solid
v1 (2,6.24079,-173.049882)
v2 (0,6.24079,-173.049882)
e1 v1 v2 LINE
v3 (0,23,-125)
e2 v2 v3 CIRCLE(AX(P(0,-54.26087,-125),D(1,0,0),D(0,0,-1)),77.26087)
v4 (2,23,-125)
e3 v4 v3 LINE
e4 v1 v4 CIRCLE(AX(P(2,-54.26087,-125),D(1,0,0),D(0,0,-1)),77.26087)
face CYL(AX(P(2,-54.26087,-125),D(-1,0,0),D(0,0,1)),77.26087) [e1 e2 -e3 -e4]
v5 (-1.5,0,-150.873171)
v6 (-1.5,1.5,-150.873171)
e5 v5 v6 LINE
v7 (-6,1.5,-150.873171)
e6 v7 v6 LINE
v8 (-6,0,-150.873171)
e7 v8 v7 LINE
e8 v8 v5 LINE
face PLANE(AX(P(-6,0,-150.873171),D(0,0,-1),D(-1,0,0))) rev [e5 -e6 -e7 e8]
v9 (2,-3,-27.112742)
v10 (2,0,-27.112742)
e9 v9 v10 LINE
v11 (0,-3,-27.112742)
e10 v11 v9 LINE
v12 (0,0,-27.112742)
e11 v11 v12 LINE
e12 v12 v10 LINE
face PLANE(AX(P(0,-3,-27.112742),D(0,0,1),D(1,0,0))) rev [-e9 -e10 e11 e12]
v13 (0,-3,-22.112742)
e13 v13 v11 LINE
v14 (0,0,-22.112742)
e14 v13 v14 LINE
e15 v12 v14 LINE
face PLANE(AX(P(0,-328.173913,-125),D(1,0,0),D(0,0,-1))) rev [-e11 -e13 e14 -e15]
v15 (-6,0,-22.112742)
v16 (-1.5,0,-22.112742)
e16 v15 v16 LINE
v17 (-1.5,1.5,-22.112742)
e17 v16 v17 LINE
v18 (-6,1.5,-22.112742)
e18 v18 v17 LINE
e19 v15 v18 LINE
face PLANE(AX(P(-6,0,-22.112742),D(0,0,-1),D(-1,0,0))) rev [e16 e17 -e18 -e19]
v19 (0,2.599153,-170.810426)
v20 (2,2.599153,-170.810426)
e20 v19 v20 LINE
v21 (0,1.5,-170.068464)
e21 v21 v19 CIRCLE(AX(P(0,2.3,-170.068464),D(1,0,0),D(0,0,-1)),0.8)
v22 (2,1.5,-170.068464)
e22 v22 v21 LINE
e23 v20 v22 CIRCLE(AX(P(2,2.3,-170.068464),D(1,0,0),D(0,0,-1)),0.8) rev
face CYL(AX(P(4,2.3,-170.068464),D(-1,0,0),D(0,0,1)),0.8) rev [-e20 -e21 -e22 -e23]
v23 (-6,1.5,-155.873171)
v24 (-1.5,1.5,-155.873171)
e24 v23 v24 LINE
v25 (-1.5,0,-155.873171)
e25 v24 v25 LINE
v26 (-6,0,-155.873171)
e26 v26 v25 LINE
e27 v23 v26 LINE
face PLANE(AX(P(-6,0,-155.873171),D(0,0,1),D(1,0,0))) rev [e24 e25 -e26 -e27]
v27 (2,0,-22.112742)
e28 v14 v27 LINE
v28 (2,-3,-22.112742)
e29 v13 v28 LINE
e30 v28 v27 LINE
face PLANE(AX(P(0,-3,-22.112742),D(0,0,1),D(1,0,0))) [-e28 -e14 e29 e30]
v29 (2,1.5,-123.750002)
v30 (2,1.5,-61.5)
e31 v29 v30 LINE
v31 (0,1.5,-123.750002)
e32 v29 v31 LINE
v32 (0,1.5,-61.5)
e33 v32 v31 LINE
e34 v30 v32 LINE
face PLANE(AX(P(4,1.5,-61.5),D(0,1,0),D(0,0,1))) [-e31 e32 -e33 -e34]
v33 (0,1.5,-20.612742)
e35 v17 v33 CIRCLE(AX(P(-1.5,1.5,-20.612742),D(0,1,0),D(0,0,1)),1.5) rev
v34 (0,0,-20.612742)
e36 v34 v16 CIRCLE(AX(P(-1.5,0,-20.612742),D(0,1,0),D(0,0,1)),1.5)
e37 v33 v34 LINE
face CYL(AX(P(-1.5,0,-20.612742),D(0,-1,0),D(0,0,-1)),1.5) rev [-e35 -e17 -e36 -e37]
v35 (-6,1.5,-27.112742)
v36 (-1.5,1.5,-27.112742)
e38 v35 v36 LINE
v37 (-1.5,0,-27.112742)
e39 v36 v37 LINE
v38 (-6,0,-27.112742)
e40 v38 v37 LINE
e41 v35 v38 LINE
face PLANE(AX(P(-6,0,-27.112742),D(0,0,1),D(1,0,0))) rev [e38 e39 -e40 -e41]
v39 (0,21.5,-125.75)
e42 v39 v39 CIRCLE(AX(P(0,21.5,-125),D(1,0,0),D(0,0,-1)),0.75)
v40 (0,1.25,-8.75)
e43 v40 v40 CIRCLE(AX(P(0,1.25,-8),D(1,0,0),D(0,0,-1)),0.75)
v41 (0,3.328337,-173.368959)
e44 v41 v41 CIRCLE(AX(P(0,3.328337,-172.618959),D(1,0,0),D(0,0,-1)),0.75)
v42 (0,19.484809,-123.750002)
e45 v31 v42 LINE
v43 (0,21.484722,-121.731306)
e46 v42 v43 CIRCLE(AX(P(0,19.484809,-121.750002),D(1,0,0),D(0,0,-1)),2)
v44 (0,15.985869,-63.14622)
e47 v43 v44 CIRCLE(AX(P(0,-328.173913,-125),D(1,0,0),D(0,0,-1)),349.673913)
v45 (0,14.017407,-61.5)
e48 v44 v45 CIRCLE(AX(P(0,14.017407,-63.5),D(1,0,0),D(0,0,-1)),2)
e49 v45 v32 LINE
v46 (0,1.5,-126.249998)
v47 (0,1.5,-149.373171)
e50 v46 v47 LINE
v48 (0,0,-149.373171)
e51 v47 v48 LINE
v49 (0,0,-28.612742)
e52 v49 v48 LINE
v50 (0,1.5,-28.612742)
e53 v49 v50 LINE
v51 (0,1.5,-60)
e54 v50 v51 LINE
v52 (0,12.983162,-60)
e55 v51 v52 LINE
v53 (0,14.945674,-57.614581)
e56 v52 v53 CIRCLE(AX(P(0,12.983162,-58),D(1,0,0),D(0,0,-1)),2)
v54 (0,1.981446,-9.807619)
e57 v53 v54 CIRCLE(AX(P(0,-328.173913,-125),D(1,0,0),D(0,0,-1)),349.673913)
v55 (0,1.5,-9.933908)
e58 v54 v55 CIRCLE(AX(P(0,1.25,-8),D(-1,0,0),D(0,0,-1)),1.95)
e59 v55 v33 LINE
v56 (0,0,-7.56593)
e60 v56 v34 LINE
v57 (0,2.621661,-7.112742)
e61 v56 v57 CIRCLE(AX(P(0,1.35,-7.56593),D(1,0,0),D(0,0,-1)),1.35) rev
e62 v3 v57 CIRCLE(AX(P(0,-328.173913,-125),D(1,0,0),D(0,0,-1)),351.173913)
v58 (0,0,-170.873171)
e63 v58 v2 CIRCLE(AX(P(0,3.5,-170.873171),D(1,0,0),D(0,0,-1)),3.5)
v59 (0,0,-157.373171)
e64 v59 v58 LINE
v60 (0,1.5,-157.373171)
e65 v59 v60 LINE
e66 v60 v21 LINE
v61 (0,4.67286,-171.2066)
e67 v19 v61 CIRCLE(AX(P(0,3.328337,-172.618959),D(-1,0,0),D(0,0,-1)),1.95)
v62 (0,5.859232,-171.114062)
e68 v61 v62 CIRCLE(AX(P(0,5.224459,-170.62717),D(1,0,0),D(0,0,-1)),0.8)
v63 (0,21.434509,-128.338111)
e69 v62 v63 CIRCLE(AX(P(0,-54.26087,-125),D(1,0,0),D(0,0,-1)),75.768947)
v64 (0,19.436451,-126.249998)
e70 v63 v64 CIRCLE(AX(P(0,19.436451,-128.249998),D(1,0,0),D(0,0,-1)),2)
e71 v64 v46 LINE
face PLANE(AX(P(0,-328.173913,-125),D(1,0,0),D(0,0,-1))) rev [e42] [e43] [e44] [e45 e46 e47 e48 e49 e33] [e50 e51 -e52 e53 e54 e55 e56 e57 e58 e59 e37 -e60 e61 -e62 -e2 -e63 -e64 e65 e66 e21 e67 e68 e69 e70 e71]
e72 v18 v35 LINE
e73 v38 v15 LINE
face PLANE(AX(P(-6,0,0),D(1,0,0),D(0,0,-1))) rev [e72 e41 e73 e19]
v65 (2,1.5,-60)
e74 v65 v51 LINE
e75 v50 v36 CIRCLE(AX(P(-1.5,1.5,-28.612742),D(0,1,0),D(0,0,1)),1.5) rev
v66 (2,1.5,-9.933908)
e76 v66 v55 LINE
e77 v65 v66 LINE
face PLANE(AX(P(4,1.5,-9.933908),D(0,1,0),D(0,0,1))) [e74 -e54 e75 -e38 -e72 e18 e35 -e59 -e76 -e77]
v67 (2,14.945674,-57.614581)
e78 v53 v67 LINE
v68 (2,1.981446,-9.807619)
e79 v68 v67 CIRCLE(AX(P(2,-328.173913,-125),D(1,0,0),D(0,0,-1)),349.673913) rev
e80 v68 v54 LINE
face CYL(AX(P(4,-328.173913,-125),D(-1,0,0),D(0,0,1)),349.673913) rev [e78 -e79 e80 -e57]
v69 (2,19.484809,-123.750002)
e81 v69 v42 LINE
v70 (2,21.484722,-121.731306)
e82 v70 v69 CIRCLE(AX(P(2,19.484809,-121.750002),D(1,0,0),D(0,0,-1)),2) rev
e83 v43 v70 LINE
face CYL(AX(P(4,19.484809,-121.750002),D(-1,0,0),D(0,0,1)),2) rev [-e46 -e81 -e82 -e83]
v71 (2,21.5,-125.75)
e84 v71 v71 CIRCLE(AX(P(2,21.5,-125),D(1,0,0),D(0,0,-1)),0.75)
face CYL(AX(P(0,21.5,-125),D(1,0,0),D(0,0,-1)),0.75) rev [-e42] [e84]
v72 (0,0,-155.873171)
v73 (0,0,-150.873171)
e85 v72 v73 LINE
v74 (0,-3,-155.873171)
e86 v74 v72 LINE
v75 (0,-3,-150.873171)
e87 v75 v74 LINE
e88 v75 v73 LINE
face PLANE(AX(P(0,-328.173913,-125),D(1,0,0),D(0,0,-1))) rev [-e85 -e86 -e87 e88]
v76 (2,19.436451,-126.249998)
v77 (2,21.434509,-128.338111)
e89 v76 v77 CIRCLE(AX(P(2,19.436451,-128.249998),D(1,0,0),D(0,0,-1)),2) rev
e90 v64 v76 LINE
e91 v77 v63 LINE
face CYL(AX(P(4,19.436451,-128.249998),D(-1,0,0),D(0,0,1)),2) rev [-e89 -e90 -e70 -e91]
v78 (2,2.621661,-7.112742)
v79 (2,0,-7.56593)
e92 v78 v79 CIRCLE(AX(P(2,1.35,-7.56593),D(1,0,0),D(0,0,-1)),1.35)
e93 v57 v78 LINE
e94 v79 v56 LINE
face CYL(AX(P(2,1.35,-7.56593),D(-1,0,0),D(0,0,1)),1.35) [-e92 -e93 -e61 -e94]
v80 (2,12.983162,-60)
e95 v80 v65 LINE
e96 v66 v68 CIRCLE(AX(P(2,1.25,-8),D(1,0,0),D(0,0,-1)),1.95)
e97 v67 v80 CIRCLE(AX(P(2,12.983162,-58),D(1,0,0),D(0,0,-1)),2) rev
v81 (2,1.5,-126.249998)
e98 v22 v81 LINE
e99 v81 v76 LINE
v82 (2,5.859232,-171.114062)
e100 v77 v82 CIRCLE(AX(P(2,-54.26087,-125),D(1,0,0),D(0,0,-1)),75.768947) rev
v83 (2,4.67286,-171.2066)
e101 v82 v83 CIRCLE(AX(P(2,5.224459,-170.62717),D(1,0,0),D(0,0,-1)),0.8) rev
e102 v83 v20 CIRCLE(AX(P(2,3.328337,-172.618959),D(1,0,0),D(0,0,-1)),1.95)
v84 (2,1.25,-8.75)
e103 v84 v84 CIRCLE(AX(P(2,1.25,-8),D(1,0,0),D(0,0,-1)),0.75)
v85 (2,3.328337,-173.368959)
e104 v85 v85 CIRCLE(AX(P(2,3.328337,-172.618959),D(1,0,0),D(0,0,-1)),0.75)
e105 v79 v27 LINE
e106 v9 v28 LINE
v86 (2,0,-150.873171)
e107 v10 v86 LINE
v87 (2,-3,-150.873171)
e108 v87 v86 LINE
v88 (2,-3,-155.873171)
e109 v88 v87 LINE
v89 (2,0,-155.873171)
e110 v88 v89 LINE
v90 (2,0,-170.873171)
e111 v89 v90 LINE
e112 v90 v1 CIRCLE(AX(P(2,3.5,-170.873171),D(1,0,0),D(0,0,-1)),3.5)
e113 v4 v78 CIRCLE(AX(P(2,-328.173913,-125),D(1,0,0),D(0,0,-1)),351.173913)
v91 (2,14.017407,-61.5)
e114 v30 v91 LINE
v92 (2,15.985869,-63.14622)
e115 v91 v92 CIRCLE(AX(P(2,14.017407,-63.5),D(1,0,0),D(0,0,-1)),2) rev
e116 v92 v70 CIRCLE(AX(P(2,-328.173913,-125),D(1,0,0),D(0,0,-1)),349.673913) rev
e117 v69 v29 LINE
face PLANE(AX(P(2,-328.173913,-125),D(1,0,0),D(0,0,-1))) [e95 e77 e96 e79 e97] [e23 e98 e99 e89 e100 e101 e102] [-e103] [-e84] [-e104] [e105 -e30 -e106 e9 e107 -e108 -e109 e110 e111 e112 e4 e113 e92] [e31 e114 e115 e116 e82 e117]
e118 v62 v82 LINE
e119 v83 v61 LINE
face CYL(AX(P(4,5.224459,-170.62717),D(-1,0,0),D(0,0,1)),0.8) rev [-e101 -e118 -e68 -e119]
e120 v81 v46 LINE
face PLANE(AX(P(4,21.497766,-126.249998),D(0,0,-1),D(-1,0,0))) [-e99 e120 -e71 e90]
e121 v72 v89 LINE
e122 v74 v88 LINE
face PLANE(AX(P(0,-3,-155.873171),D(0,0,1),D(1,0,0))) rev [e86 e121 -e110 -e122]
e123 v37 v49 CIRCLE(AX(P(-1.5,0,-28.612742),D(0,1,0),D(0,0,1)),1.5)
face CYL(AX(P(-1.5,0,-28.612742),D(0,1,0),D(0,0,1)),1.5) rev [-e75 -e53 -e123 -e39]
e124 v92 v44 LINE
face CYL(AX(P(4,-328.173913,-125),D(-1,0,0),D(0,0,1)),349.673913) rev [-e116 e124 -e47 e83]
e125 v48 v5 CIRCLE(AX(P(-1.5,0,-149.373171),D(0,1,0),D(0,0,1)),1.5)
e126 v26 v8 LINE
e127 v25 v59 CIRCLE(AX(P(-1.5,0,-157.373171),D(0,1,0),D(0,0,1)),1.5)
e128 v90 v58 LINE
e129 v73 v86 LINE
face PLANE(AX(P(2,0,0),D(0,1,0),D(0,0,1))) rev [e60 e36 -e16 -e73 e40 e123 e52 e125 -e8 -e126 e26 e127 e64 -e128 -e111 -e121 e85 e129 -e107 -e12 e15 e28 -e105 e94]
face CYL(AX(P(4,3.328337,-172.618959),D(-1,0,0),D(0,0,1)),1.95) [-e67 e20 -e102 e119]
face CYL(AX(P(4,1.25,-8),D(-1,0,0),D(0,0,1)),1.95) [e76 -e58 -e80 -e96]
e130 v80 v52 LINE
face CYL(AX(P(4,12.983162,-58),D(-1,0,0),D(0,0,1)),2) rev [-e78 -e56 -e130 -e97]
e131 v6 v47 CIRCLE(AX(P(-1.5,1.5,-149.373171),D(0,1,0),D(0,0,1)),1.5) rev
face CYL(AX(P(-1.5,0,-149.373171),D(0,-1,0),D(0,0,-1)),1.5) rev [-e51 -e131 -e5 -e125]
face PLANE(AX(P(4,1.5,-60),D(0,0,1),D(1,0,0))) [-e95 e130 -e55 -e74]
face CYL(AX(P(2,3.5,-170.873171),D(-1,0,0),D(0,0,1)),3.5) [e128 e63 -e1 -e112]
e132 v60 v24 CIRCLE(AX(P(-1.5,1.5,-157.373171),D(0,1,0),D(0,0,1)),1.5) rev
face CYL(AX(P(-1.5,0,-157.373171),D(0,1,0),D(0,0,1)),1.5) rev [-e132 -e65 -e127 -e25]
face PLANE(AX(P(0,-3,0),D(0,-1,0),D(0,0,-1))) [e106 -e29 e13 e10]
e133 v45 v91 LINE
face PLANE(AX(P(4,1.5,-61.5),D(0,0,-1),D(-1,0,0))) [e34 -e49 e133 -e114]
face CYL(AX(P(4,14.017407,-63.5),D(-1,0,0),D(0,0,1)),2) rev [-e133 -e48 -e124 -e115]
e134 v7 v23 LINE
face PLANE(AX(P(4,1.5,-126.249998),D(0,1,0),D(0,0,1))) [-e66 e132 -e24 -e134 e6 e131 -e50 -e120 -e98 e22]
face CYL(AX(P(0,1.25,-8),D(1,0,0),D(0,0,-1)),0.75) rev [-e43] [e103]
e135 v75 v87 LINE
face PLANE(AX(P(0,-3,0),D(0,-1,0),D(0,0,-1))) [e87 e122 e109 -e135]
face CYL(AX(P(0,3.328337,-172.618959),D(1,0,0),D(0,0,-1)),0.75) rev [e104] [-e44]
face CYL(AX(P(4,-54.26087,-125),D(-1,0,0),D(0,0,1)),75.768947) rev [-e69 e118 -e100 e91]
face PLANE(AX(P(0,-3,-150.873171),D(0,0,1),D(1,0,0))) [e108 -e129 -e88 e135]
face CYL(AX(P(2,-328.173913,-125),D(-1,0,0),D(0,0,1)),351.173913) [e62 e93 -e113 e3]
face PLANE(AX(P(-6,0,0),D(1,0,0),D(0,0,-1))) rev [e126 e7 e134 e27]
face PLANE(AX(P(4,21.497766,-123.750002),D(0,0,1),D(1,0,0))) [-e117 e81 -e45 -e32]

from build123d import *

# Parameters (mm, degrees)
BOSS_EXTRU_1_DEPTH      = 2
ESQUISSE4_R             = 0.75
ENL_V_MAT_EXTRU_2_DEPTH = 176.894862906
ENL_V_MAT_EXTRU_3_DEPTH = 4
CONG_2_R                = 1.35
ESQUISSE12_W            = 2
ESQUISSE12_H            = 5
BOSS_EXTRU_2_DEPTH      = 3
CONG_3_R                = 2
CONG_4_R                = 0.8
ESQUISSE13_W            = 5
ESQUISSE13_H            = 1.5
BOSS_EXTRU_3_DEPTH      = 6
CONG_5_R                = 1.5


with BuildPart() as part:
    # Esquisse2 → Boss.-Extru.1 (new body)
    with BuildSketch(Plane(origin=(0, 0, 0), x_dir=(0, 0, -1), z_dir=(1, 0, 0))):
        with BuildLine():
            Line((0, 0), (170.873171093, 0))
            ThreePointArc((170.873171093, 0), (174.177922559, 2.347343181), (173.049882129, 6.240789861))
            ThreePointArc((173.049882129, 6.240789861), (150.444362328, 18.689979585), (125, 23))
            ThreePointArc((125, 23), (61.450806457, 17.202138822), (0, 0))
        make_face()
    extrude(amount=BOSS_EXTRU_1_DEPTH)

    # Esquisse4 → Enlèv. mat.-Extru.2 (cut, through all)
    with BuildSketch(Plane(origin=(2, 0, 0), x_dir=(0, 0, -1), z_dir=(1, 0, 0))):
        with Locations((125, 21.5)):
            Circle(ESQUISSE4_R)
        with Locations((172.618958832, 3.328337296)):
            Circle(ESQUISSE4_R)
        with Locations((8, 1.25)):
            Circle(ESQUISSE4_R)
    extrude(amount=-ENL_V_MAT_EXTRU_2_DEPTH, mode=Mode.SUBTRACT)

    # Esquisse9 → Enlèv. mat.-Extru.3 (cut)
    with BuildSketch(Plane(origin=(0, 0, 0), x_dir=(0, 0, -1), z_dir=(1, 0, 0))):
        with BuildLine():
            Line((126.249998003, 1.5), (171.940959768, 1.5))
            ThreePointArc((171.940959768, 1.5), (170.669151645, 3.355758734), (171.992643995, 5.175018028))
            ThreePointArc((171.992643995, 5.175018028), (150.464605834, 17.100795028), (126.249998003, 21.497765776))
            Line((126.249998003, 21.497765776), (126.249998003, 1.5))
        make_face()
        with BuildLine():
            Line((9.933907961, 1.5), (60, 1.5))
            Line((60, 1.5), (60, 15.405547145))
            ThreePointArc((60, 15.405547145), (34.654135968, 9.627019927), (9.807619224, 1.981445651))
            ThreePointArc((9.807619224, 1.981445651), (9.886187662, 1.744768736), (9.933907961, 1.5))
        make_face()
        with BuildLine():
            Line((61.5, 1.5), (123.750001997, 1.5))
            Line((123.750001997, 1.5), (123.750001997, 21.497765776))
            ThreePointArc((123.750001997, 21.497765776), (92.494848054, 19.985907384), (61.5, 15.685935533))
            Line((61.5, 15.685935533), (61.5, 1.5))
        make_face()
    extrude(amount=ENL_V_MAT_EXTRU_3_DEPTH, mode=Mode.SUBTRACT)

    # Congé2
    cong_2_edges = [part.edges().sort_by_distance(p)[0] for p in [
        (1, 0, 0),
    ]]
    fillet(cong_2_edges, radius=CONG_2_R)

    # Esquisse12 → Boss.-Extru.2 (add)
    with BuildSketch(Plane.XZ):
        with Locations((1, -153.373171093)):
            Rectangle(ESQUISSE12_W, ESQUISSE12_H)
        with Locations((1, -24.612741703)):
            Rectangle(ESQUISSE12_W, ESQUISSE12_H)
    extrude(amount=BOSS_EXTRU_2_DEPTH)

    # Congé3
    cong_3_edges = [part.edges().sort_by_distance(p)[0] for p in [
        (1, 15.405547145, -60),
        (1, 21.497765776, -126.249998003),
        (1, 21.497765776, -123.750001997),
        (1, 15.685935533, -61.5),
    ]]
    fillet(cong_3_edges, radius=CONG_3_R)

    # Congé4
    cong_4_edges = [part.edges().sort_by_distance(p)[0] for p in [
        (1, 5.175018028, -171.992643995),
        (1, 1.5, -171.940959768),
    ]]
    fillet(cong_4_edges, radius=CONG_4_R)

    # Esquisse13 → Boss.-Extru.3 (add)
    with BuildSketch(Plane.ZY):
        with Locations((-153.373171093, 0.75)):
            Rectangle(ESQUISSE13_W, ESQUISSE13_H)
        with Locations((-24.612741703, 0.75)):
            Rectangle(ESQUISSE13_W, ESQUISSE13_H)
    extrude(amount=BOSS_EXTRU_3_DEPTH)

    # Congé5
    # the kernel refuses this fillet: 1.5 mm, written as the material it adds along each edge
    with BuildSketch(Plane(origin=(0, 1.5, -155.873171093), x_dir=(0, 0, -1), z_dir=(0, -1, 0)), Plane(origin=(0, 0, -150.873171093), x_dir=(0, 0, 1), z_dir=(0, 1, 0)), Plane(origin=(0, 1.5, -27.112741703), x_dir=(0, 0, -1), z_dir=(0, -1, 0)), Plane(origin=(0, 0, -22.112741703), x_dir=(0, 0, 1), z_dir=(0, 1, 0))) as cong_5_piece_1:
        with BuildLine():
            CenterArc((CONG_5_R, -CONG_5_R), CONG_5_R, 90, 90)
            Line((0, -CONG_5_R), (0, 0))
            Line((0, 0), (CONG_5_R, 0))
        make_face()
    extrude(amount=1.5)


solid = part.part
